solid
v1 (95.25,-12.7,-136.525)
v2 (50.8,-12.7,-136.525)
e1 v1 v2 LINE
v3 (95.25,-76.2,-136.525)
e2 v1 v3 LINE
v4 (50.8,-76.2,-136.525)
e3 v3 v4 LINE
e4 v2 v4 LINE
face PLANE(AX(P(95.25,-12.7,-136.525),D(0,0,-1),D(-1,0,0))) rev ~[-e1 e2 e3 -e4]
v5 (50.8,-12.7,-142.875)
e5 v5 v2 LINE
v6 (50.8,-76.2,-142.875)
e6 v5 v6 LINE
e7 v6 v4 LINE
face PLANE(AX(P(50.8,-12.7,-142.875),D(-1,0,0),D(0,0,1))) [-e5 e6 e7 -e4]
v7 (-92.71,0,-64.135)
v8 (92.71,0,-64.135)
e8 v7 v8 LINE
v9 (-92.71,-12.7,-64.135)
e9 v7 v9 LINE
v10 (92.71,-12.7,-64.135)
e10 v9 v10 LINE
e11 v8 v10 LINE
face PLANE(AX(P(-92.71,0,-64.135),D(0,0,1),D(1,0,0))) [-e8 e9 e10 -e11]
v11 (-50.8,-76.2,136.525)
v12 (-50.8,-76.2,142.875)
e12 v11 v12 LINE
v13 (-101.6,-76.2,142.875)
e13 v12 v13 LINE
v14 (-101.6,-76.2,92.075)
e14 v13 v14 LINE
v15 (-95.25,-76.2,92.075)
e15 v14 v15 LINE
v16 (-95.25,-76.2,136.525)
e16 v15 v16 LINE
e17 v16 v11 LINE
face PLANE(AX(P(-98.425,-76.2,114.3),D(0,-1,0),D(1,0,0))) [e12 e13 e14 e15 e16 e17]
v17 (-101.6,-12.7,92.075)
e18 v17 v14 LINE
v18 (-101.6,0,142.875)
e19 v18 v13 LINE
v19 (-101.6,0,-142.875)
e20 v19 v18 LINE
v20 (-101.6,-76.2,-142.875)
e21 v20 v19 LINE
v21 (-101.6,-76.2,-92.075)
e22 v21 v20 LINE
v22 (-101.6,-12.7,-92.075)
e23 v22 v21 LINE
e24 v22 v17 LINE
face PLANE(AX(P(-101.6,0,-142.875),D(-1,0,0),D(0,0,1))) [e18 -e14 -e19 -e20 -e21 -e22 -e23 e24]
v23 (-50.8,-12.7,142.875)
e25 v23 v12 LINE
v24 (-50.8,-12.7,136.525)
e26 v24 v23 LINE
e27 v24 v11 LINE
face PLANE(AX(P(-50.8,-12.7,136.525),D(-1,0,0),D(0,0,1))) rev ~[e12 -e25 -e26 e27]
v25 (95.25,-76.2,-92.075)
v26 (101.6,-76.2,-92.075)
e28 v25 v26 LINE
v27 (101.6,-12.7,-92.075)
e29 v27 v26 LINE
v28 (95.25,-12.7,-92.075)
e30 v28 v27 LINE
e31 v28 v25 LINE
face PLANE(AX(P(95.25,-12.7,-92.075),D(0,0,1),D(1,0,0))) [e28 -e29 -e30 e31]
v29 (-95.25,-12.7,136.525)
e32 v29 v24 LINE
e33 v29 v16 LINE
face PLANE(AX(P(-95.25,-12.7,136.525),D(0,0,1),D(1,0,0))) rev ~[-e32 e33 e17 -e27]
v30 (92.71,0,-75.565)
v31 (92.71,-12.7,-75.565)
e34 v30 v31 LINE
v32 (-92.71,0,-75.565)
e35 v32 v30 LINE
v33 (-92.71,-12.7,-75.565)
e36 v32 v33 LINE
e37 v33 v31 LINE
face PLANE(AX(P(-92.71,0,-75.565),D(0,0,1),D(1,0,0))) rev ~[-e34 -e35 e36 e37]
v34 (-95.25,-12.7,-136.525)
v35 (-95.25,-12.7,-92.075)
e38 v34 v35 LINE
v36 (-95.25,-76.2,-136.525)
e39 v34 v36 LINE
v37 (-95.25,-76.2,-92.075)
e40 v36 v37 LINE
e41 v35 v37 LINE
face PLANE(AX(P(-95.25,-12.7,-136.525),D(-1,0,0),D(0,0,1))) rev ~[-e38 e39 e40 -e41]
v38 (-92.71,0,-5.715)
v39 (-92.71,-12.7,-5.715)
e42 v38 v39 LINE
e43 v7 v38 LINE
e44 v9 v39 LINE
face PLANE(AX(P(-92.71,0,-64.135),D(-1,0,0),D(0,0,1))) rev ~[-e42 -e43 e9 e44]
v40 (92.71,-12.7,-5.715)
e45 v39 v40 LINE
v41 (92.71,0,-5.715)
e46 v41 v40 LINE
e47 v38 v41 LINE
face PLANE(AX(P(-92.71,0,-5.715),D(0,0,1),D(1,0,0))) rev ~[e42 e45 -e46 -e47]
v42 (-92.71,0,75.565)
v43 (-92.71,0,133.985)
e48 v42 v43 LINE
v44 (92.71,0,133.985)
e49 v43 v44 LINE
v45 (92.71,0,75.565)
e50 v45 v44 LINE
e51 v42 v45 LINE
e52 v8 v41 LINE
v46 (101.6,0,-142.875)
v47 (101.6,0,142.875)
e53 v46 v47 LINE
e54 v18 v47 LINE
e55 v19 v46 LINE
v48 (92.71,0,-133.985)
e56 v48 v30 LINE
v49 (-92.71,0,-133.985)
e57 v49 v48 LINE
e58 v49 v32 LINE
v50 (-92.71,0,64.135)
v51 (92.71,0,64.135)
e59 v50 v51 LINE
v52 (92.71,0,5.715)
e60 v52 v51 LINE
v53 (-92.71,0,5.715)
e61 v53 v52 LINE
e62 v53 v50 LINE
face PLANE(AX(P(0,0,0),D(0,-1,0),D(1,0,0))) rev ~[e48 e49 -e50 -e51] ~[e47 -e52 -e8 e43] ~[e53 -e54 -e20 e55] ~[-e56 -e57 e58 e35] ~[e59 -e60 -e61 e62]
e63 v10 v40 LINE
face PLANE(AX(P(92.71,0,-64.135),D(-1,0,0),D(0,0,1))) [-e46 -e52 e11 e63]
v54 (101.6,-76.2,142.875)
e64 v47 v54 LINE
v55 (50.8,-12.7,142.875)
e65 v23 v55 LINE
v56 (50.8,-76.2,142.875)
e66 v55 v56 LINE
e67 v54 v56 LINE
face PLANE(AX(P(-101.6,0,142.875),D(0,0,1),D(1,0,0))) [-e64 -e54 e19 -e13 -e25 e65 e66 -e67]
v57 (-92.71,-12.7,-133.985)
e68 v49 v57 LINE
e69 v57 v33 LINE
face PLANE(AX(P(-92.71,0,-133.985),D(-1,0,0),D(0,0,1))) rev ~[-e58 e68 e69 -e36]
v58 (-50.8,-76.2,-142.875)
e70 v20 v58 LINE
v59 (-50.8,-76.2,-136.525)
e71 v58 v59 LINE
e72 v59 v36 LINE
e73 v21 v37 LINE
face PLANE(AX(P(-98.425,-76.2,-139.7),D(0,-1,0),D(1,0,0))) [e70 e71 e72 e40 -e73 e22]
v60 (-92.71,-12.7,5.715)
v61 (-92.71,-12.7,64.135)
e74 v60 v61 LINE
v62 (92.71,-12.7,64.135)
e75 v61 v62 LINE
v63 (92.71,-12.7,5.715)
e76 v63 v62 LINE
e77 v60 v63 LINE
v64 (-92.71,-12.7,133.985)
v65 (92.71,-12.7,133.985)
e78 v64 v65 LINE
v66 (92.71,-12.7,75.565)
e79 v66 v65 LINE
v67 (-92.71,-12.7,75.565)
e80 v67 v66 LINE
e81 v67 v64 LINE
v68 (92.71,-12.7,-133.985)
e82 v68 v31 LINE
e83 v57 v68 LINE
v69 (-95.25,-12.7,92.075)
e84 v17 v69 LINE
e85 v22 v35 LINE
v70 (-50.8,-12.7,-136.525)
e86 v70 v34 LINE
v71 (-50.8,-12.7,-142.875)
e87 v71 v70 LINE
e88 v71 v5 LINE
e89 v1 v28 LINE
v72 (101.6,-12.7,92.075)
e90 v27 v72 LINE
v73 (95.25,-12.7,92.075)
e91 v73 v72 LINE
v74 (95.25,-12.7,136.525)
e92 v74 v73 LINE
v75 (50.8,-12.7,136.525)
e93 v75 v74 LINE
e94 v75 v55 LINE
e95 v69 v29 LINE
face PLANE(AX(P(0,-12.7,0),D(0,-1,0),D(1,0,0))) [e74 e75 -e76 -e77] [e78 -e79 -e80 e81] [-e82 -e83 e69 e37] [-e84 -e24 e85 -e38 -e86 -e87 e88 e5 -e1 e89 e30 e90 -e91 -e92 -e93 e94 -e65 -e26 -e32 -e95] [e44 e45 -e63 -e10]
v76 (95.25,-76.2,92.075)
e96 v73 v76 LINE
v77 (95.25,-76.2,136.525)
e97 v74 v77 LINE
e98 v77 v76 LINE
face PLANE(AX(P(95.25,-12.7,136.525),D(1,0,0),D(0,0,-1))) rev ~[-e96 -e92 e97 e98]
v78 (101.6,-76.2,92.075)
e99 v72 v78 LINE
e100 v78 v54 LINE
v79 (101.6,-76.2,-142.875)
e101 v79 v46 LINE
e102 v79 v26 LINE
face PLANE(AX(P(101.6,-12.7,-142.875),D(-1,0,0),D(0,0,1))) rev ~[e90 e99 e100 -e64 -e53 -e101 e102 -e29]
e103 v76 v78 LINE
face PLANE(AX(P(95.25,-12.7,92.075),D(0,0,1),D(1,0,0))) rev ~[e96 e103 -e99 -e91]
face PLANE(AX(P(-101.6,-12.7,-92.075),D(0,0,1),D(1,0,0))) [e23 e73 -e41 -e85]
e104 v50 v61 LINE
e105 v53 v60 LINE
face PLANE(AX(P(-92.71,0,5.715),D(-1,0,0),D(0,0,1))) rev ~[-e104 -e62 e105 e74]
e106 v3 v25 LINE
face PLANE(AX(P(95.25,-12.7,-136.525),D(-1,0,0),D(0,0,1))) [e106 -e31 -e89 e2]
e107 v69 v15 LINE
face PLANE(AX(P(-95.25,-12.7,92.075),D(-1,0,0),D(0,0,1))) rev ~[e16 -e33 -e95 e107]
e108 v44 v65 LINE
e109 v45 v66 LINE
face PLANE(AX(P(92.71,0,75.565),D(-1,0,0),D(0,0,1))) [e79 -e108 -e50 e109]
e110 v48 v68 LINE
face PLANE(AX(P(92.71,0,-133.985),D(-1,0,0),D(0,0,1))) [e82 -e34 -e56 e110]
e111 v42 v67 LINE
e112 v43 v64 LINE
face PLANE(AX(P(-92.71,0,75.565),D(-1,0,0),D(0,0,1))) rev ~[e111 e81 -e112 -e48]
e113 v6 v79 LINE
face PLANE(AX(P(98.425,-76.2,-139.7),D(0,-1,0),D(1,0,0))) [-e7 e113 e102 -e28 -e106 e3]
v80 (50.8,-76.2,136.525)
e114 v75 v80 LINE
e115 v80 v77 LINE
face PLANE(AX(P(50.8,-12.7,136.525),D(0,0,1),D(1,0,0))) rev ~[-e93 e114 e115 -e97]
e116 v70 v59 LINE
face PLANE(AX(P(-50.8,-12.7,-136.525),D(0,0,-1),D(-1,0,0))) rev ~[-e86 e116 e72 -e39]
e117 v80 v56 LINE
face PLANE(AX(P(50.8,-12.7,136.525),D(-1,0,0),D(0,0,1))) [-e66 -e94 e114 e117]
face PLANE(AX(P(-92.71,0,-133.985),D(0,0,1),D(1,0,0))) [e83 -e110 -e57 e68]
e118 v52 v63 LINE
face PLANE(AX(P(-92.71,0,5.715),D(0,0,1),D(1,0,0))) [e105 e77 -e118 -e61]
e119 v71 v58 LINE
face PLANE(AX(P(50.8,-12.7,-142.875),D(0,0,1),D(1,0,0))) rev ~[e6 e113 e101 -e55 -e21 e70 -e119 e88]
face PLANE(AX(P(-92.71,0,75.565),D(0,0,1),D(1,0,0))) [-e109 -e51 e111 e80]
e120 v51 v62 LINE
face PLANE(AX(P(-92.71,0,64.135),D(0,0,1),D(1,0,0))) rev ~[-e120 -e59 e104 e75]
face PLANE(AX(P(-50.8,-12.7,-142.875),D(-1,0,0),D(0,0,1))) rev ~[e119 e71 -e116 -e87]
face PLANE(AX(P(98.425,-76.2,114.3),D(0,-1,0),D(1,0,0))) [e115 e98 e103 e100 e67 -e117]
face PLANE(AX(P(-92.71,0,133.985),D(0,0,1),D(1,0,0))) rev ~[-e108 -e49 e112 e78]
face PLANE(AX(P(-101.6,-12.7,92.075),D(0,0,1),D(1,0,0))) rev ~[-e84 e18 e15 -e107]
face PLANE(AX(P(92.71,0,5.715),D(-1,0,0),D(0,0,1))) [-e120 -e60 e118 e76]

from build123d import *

# Parameters (mm, degrees)
F0_W     = 203.2
F0_H     = 285.75
F0_W_2   = 190.5
F0_H_2   = 63.5
F0_W_3   = 185.42
F0_H_3   = 58.42
F1_DEPTH = 12.7
F3_W     = 6.35
F3_H     = 6.35
F3_W_2   = 44.45
F3_H_2   = 44.45
F4_DEPTH = 63.5


# Not quite as in the source:
# - the program builds the solid bodies; features that only make, move or delete a surface that nothing else refers to are left out


with BuildPart() as f1:
    # F0 (on Front) → F1 (new body)
    with BuildSketch(Plane.XZ):
        Rectangle(F0_W, F0_H)
        with Locations((0, -104.775)):
            Rectangle(F0_W_2, F0_H_2, mode=Mode.SUBTRACT)
        with Locations((0, -34.925)):
            Rectangle(F0_W_2, F0_H_2, mode=Mode.SUBTRACT)
        with Locations((0, 34.925)):
            Rectangle(F0_W_2, F0_H_2, mode=Mode.SUBTRACT)
        with Locations((0, 104.775)):
            Rectangle(F0_W_2, F0_H_2, mode=Mode.SUBTRACT)
        with Locations((0, 104.775)):
            Rectangle(F0_W_2, F0_H_2)
        with Locations((0, 104.775)):
            Rectangle(F0_W_3, F0_H_3, mode=Mode.SUBTRACT)
        with Locations((0, 34.925)):
            Rectangle(F0_W_2, F0_H_2)
        with Locations((0, 34.925)):
            Rectangle(F0_W_3, F0_H_3, mode=Mode.SUBTRACT)
        with Locations((0, -34.925)):
            Rectangle(F0_W_2, F0_H_2)
        with Locations((0, -34.925)):
            Rectangle(F0_W_3, F0_H_3, mode=Mode.SUBTRACT)
        with Locations((0, -104.775)):
            Rectangle(F0_W_2, F0_H_2)
        with Locations((0, -104.775)):
            Rectangle(F0_W_3, F0_H_3, mode=Mode.SUBTRACT)
    extrude(amount=F1_DEPTH)

    # F3 (on face) → F4 (join)
    with BuildSketch(Plane.XZ.offset(12.7)):
        with Locations((98.425, -139.7)):
            Rectangle(F3_W, F3_H)
        with Locations((73.025, -139.7)):
            Rectangle(F3_W_2, F3_H)
        with Locations((98.425, -114.3)):
            Rectangle(F3_W, F3_H_2)
        with Locations((98.425, 114.3)):
            Rectangle(F3_W, F3_H_2)
        with Locations((98.425, 139.7)):
            Rectangle(F3_W, F3_H)
        with Locations((73.025, 139.7)):
            Rectangle(F3_W_2, F3_H)
        with Locations((-98.425, -139.7)):
            Rectangle(F3_W, F3_H)
        with Locations((-73.025, -139.7)):
            Rectangle(F3_W_2, F3_H)
        with Locations((-98.425, -114.3)):
            Rectangle(F3_W, F3_H_2)
        with Locations((-98.425, 114.3)):
            Rectangle(F3_W, F3_H_2)
        with Locations((-98.425, 139.7)):
            Rectangle(F3_W, F3_H)
        with Locations((-73.025, 139.7)):
            Rectangle(F3_W_2, F3_H)
    extrude(amount=F4_DEPTH)


solid = f1.part
